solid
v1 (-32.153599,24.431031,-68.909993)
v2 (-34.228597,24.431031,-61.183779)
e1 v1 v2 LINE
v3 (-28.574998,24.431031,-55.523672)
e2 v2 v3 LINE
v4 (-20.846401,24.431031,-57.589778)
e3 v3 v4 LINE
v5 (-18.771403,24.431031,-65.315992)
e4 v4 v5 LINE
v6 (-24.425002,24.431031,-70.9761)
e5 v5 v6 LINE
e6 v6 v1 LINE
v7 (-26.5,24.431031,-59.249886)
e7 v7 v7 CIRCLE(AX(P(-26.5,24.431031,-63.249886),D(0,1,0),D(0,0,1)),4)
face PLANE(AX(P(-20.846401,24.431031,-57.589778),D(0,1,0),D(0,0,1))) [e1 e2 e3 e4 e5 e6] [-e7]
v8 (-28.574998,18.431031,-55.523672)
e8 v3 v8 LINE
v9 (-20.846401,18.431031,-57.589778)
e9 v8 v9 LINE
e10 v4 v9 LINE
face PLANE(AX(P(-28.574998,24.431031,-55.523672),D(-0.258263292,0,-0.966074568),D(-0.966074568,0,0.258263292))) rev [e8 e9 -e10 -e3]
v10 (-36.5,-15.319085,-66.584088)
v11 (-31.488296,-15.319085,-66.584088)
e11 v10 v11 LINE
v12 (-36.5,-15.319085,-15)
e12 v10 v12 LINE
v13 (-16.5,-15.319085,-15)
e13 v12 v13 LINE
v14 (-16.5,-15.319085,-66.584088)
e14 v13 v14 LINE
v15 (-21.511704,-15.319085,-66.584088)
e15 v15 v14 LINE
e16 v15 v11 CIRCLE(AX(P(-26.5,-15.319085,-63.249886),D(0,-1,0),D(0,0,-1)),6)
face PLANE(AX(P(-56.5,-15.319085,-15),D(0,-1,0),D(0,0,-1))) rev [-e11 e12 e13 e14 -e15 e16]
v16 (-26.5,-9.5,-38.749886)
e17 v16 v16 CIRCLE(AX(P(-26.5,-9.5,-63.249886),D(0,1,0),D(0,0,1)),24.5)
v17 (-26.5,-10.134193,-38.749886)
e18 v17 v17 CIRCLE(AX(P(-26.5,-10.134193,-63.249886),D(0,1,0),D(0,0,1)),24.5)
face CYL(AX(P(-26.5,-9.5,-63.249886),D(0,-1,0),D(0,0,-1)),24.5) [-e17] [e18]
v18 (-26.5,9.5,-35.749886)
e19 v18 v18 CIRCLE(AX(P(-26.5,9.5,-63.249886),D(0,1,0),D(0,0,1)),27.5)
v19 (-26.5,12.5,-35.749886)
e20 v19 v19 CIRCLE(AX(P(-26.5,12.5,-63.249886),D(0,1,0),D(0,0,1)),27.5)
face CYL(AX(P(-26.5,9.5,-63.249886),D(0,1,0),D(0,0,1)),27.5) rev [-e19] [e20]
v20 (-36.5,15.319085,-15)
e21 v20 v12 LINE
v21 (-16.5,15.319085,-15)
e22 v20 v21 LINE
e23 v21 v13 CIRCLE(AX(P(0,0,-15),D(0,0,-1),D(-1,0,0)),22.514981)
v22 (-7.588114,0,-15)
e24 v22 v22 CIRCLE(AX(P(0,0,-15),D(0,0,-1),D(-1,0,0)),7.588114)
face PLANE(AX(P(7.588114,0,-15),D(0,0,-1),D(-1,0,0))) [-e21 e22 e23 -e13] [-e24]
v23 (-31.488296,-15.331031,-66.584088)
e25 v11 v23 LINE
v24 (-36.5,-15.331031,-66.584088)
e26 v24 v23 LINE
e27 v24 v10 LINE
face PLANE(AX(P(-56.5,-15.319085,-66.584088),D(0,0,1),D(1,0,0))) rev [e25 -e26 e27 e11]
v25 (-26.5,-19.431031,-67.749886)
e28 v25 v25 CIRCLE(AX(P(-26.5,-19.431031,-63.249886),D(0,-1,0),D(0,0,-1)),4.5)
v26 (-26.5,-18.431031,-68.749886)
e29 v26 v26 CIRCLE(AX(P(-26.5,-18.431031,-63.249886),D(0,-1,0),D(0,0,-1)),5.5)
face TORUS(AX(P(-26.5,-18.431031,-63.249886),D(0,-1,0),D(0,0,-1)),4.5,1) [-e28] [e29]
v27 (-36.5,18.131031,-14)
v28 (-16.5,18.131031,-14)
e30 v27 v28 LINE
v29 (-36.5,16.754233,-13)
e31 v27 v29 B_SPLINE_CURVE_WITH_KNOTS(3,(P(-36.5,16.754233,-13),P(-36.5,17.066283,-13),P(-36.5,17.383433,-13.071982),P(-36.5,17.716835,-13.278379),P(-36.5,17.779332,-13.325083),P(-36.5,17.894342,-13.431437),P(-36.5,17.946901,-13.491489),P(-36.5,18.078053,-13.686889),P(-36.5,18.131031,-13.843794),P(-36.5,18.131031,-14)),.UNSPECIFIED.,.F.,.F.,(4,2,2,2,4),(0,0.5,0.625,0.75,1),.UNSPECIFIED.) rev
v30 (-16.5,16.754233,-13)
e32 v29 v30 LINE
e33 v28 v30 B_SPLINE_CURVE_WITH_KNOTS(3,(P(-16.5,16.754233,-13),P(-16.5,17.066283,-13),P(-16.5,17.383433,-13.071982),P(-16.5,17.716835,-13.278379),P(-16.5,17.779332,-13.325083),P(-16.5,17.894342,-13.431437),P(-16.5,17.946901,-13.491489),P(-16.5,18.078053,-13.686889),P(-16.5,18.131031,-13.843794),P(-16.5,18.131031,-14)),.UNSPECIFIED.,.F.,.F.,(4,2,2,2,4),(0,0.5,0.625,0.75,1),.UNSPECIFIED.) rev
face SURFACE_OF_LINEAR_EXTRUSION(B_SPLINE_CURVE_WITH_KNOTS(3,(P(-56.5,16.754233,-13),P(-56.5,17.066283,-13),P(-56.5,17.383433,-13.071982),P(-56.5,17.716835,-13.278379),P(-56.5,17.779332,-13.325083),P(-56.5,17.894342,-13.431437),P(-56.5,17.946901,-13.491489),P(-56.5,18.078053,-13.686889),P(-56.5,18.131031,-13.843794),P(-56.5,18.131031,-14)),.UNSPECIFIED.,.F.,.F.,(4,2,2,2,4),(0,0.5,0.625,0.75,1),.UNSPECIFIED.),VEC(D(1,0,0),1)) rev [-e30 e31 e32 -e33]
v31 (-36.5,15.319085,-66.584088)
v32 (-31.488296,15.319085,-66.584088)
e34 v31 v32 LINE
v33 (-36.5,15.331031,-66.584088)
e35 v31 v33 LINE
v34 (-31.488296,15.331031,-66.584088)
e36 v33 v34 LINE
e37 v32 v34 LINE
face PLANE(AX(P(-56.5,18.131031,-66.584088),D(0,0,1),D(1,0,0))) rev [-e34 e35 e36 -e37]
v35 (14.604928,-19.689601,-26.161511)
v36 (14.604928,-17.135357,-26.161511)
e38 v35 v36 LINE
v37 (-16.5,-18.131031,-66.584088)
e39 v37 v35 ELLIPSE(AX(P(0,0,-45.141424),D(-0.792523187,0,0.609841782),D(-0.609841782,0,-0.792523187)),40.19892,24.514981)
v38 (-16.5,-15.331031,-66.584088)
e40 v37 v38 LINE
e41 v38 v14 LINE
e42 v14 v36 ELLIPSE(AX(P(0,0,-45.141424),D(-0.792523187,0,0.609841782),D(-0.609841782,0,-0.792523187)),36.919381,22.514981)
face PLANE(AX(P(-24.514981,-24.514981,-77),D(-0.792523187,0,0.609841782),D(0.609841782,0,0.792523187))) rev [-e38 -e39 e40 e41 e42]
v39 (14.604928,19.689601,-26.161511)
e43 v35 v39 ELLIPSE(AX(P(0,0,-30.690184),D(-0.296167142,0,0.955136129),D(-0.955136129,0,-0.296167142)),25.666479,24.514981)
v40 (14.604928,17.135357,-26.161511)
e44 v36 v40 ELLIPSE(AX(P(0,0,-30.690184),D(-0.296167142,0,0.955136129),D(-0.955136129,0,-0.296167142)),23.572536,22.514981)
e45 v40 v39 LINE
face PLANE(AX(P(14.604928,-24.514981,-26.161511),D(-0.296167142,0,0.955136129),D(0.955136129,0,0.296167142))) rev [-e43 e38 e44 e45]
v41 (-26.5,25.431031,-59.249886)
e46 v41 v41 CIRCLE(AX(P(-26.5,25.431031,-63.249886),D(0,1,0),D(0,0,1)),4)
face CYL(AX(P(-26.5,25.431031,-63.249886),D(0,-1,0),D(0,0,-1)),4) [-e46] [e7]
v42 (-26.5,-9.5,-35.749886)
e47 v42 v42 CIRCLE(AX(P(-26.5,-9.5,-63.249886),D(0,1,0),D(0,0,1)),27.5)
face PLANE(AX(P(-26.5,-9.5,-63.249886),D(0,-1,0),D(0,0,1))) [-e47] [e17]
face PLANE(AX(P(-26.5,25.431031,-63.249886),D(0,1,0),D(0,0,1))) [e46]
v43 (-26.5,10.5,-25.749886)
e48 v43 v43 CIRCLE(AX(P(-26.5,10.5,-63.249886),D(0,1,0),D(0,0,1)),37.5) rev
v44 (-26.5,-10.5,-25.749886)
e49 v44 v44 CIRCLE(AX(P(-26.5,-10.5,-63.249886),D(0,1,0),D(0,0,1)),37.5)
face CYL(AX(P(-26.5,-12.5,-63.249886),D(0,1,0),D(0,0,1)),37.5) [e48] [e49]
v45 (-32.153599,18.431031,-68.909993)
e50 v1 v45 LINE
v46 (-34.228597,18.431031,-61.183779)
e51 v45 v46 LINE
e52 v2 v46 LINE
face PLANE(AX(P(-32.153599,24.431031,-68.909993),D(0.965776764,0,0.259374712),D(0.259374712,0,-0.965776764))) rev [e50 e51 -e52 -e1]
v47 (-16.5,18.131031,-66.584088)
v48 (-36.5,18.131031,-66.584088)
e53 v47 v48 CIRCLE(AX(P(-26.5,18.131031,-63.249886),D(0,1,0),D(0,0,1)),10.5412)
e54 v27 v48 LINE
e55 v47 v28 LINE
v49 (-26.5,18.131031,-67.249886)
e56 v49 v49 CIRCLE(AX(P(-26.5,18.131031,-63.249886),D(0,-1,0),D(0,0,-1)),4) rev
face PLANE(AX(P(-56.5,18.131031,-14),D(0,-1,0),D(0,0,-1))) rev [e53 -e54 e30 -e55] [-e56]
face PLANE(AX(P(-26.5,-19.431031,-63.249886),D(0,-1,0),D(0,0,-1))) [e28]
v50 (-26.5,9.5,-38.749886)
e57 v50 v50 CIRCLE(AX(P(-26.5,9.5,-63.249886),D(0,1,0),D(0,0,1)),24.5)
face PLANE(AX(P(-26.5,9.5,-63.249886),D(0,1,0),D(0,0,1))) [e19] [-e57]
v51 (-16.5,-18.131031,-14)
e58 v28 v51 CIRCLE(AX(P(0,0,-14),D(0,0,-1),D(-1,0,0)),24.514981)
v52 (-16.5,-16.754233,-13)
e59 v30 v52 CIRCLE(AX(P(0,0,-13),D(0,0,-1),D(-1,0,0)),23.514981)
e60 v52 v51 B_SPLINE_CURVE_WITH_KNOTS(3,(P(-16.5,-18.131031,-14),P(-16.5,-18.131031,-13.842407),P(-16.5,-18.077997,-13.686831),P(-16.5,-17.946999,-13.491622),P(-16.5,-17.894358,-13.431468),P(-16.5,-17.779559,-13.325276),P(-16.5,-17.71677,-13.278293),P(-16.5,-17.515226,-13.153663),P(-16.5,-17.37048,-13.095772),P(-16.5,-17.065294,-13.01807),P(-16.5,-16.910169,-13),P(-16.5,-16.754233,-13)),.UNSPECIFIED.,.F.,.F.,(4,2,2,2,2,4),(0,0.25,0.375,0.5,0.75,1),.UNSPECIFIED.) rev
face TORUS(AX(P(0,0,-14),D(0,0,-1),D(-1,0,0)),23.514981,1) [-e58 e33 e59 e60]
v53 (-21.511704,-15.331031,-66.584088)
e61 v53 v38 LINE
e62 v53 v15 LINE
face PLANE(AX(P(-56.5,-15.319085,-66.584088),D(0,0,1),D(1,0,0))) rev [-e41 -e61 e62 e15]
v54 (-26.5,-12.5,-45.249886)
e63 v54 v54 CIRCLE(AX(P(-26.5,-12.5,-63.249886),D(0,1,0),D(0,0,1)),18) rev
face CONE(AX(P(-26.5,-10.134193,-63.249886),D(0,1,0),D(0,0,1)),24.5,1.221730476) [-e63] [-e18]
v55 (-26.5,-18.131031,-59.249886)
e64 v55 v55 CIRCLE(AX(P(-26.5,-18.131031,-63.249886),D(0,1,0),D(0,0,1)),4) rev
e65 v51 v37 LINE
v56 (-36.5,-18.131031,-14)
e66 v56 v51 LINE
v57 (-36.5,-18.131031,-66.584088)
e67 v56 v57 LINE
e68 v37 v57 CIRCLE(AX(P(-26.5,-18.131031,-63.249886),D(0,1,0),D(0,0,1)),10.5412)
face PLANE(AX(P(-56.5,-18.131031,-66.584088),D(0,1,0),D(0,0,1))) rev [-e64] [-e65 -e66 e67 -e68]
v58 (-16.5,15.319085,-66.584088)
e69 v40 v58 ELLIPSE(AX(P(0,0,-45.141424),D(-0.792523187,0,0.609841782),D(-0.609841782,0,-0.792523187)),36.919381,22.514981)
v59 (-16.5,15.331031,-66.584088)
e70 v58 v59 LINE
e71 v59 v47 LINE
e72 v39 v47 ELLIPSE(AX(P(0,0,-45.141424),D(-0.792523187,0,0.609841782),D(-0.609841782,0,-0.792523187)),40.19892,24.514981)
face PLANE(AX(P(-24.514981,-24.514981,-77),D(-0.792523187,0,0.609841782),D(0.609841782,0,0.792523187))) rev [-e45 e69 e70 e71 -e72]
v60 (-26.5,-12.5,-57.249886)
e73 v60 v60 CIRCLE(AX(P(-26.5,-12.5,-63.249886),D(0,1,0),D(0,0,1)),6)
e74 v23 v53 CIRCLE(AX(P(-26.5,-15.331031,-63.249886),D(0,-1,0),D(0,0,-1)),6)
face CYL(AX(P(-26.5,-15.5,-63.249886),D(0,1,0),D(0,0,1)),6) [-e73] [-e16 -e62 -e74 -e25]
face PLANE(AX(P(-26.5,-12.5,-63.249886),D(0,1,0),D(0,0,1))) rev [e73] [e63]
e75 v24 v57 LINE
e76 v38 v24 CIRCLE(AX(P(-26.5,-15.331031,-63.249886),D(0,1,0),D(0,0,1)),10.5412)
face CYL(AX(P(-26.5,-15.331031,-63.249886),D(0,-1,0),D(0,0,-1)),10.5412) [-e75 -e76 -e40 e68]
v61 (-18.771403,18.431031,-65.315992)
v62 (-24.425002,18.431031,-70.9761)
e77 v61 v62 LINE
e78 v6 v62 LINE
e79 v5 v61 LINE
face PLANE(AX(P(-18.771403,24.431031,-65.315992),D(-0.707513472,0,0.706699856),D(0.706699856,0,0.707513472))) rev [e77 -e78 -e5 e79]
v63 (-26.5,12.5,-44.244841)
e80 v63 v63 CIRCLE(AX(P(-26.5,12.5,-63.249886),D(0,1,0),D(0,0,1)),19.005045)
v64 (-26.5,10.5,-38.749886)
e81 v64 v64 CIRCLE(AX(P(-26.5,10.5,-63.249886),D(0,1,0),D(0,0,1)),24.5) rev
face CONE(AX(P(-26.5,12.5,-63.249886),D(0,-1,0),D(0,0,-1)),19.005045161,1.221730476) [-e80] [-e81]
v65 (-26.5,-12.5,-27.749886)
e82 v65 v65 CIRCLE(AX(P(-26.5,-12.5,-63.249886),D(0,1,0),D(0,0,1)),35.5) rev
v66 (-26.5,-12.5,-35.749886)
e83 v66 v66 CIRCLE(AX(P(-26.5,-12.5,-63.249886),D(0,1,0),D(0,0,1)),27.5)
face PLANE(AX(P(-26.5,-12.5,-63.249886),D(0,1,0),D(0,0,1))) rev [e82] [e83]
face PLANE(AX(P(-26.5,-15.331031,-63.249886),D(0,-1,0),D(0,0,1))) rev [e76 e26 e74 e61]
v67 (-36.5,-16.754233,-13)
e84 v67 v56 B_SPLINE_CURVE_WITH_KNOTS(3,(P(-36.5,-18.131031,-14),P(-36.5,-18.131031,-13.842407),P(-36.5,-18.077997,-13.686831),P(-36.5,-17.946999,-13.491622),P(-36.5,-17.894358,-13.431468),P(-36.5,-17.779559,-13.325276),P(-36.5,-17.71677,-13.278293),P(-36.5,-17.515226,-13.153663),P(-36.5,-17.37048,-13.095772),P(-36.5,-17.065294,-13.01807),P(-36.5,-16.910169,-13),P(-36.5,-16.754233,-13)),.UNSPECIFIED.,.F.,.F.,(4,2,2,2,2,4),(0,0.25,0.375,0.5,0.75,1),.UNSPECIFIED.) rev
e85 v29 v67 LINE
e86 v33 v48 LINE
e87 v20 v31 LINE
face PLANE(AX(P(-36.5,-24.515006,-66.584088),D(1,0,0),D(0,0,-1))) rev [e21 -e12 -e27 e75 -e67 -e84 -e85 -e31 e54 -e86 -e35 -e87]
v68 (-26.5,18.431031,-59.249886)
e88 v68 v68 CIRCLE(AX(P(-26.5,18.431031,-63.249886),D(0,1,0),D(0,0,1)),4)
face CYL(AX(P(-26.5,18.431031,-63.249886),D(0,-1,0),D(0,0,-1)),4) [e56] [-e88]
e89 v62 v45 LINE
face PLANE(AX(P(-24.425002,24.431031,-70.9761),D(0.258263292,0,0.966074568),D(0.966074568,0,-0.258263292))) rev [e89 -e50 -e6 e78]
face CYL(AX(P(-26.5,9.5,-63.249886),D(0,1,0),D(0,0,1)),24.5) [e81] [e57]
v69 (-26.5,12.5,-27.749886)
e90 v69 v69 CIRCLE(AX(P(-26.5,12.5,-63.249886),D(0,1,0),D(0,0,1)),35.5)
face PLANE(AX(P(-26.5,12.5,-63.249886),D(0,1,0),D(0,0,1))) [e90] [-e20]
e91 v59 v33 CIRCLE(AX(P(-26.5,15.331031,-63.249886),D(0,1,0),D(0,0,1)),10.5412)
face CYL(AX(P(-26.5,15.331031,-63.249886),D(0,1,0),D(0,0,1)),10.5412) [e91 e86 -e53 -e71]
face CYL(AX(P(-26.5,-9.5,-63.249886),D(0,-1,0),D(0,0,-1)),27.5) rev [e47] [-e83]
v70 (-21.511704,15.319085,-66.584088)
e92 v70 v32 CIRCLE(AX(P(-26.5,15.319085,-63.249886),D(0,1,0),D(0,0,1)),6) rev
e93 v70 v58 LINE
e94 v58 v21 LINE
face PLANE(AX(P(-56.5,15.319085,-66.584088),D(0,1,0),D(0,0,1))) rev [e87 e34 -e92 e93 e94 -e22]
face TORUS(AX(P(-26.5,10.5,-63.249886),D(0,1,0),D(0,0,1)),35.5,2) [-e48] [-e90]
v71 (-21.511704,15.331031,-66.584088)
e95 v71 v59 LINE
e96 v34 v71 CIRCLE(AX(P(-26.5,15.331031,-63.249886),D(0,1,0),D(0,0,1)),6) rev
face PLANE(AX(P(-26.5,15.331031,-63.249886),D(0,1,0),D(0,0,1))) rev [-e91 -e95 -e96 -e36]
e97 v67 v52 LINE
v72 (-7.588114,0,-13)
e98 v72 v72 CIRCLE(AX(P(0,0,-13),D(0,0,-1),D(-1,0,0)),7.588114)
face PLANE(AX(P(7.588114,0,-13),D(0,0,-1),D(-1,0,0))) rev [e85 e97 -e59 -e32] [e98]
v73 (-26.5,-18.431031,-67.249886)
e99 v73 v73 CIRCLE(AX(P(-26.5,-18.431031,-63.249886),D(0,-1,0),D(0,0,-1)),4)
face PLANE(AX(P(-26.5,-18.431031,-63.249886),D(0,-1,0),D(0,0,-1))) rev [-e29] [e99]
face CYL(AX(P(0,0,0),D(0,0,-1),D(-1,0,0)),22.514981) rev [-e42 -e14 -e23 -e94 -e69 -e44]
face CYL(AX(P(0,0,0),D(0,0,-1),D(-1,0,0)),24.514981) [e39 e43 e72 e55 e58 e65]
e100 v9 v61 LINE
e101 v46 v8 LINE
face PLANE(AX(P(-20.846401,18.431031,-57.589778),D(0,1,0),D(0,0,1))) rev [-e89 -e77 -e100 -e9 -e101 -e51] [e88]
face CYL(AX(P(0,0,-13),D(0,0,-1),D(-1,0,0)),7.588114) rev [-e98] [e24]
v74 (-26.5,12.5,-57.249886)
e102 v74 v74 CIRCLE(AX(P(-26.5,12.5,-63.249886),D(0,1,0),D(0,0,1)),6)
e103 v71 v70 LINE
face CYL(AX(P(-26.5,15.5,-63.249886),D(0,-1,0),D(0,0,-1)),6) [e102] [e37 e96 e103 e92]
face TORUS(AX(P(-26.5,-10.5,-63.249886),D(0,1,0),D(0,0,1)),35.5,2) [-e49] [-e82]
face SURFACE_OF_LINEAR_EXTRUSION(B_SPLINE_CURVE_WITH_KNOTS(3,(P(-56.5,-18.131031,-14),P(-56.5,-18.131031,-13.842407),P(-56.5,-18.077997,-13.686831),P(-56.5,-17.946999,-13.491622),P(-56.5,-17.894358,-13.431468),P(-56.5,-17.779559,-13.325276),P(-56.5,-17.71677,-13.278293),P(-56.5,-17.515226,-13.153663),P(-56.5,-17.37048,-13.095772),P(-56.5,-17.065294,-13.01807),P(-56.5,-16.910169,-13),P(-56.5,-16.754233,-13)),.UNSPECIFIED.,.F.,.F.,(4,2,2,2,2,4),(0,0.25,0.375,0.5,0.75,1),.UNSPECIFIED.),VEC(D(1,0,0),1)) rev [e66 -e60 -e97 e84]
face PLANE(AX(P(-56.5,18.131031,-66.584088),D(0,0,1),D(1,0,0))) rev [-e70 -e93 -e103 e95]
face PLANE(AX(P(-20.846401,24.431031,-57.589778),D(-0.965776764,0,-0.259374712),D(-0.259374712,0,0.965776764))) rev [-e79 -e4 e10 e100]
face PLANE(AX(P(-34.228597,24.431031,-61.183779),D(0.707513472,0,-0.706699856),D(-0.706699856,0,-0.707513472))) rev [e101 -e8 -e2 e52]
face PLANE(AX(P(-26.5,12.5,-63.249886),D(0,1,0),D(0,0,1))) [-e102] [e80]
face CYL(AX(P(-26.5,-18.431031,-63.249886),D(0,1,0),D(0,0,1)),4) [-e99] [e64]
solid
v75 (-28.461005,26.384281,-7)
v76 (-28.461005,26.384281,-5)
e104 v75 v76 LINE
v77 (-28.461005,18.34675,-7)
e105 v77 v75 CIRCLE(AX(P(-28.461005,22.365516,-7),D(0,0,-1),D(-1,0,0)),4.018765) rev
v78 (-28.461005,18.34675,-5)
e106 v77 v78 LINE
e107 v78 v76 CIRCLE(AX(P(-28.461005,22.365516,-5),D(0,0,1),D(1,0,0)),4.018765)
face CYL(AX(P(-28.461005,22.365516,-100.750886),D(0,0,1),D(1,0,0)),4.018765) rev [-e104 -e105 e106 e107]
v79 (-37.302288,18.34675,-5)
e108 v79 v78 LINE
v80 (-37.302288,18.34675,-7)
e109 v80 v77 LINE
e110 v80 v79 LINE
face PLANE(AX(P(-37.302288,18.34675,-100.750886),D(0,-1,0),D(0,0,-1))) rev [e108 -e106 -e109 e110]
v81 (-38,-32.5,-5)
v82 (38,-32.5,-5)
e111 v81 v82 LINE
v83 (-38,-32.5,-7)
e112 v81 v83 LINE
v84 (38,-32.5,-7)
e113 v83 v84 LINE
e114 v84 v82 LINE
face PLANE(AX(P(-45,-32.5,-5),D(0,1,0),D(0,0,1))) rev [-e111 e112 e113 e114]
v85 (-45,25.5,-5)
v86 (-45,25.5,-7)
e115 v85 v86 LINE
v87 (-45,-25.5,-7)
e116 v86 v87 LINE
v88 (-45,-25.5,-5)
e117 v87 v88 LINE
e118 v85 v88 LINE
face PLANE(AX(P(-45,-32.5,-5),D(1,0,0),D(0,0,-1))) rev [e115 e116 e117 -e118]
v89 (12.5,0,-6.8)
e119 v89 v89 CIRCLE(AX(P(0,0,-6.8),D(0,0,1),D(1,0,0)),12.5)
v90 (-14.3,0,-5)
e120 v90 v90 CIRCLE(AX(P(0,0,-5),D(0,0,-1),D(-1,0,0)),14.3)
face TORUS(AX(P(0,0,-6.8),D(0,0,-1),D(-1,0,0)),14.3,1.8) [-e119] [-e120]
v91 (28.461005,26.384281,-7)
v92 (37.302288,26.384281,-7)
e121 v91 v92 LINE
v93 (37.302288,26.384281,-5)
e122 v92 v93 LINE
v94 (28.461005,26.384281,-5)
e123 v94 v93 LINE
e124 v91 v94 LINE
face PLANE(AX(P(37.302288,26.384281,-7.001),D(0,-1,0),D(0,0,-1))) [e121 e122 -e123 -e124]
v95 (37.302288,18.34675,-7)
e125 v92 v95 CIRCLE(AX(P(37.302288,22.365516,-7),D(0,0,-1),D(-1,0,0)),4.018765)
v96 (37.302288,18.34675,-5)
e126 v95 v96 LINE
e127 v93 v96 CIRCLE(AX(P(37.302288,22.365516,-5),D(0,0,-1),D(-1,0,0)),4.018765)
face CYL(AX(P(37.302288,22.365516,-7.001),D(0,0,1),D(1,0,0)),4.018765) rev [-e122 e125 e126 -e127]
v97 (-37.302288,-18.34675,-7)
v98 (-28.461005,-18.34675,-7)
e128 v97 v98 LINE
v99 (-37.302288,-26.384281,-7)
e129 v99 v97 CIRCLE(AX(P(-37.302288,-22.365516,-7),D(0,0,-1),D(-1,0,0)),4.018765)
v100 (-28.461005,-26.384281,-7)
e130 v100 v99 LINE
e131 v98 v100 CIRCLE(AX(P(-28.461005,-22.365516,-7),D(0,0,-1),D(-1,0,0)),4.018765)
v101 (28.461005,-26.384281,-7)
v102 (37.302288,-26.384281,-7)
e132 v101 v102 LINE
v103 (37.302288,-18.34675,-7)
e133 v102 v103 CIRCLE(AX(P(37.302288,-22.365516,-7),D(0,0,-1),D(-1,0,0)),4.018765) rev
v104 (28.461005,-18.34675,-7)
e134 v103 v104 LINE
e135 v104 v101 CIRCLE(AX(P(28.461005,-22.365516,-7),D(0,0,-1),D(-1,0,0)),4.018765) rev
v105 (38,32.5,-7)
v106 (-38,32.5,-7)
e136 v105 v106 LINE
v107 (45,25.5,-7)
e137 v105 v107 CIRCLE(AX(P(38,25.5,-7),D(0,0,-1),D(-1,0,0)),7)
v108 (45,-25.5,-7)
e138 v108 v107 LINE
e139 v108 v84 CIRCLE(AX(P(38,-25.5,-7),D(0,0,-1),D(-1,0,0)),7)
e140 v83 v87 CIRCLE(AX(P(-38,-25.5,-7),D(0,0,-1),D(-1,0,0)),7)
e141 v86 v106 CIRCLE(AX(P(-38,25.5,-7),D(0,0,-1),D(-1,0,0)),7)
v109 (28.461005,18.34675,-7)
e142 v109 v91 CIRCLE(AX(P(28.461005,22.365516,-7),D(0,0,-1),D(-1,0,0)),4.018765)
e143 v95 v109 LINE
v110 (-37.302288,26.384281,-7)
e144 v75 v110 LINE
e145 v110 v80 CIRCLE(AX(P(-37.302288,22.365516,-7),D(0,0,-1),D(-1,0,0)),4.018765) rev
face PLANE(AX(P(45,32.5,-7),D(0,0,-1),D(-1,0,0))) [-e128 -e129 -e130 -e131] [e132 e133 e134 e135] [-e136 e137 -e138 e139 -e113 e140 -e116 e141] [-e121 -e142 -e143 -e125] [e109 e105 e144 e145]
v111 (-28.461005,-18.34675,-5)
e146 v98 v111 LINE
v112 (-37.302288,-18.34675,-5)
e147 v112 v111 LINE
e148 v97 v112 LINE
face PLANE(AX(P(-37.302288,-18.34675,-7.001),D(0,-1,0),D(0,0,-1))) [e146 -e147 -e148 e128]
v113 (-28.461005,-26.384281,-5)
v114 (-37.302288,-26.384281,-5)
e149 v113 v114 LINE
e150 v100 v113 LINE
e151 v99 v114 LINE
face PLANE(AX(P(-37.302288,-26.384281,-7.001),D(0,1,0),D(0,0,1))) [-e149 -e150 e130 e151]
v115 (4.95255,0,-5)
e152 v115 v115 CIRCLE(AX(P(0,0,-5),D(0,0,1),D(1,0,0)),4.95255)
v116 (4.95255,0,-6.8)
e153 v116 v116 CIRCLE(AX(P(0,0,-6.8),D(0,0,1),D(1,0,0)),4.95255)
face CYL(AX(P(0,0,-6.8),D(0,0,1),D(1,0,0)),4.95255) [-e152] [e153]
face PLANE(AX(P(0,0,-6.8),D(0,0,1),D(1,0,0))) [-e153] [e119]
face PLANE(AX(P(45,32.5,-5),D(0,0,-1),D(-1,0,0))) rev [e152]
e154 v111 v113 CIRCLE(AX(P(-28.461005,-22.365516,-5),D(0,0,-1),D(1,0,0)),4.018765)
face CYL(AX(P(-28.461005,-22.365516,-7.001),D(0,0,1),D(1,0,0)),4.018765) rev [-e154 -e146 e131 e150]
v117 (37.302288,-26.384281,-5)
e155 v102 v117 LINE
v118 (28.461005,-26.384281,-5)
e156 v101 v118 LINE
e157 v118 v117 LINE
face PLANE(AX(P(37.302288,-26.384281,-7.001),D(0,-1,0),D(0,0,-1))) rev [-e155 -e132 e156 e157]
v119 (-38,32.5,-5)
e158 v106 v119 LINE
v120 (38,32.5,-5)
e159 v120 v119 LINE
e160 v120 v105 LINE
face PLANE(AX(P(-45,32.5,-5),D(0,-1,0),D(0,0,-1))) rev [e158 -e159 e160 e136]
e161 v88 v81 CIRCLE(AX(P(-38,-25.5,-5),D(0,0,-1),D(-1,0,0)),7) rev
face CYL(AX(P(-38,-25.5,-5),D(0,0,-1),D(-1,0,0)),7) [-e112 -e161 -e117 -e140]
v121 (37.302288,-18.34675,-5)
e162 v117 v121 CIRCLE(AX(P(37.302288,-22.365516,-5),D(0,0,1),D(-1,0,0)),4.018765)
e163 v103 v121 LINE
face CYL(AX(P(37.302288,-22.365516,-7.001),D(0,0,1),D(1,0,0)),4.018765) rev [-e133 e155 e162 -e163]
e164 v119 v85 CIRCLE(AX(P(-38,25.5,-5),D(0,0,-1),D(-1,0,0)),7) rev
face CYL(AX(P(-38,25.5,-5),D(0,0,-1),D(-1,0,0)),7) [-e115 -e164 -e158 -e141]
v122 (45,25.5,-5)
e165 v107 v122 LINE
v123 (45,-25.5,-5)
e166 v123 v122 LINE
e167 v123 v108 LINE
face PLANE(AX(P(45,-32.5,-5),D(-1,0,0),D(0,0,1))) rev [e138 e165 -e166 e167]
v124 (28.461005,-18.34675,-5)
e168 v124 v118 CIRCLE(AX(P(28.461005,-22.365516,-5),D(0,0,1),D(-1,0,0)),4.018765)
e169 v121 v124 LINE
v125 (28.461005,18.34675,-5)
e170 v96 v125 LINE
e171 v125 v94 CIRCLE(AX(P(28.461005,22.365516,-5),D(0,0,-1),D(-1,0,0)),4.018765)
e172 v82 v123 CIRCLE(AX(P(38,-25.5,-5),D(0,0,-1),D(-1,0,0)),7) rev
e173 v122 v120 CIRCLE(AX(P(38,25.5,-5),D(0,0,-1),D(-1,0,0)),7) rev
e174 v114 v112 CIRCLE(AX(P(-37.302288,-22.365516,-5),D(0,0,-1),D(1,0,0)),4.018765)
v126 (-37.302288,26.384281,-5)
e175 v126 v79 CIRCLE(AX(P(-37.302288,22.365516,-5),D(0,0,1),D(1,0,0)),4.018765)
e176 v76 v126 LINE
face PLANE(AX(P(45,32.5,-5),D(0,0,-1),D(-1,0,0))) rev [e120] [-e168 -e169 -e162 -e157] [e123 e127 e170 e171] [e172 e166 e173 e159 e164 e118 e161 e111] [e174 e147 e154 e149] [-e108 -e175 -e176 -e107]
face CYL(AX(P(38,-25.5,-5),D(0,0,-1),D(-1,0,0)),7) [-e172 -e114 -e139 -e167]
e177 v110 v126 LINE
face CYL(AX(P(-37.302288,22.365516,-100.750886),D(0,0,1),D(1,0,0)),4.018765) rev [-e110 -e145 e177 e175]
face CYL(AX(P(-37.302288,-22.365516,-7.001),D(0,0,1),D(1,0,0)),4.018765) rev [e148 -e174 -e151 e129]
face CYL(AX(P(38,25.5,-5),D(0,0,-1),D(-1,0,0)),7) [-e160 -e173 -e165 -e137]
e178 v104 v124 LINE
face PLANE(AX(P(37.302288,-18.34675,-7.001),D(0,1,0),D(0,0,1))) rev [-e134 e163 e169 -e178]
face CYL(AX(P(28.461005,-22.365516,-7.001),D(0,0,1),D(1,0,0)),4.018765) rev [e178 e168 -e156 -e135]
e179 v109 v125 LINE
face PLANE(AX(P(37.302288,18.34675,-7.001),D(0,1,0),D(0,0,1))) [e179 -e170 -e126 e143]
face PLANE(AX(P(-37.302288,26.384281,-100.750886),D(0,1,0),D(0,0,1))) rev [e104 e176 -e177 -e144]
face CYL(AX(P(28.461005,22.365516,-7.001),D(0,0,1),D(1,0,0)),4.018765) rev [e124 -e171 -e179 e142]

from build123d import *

# Parameters (mm, degrees)
CUT_EXTRUDE_2_DEPTH      = 85.445062578
CUT_EXTRUDE_2_DEPTH_BACK = 85.445062578
CUT_EXTRUDE_3_DEPTH      = 85.445062578
CUT_EXTRUDE_3_DEPTH_BACK = 85.445062578
EXTRUDE_6_DEPTH          = 40
EXTRUDE_7_DEPTH          = 2.8
CUT_EXTRUDE_4_DEPTH      = 103.254861861
SKETCH_18_R              = 4
EXTRUDE_8_DEPTH          = 0.3
EXTRUDE_9_DEPTH          = 6
SKETCH_20_R              = 4
EXTRUDE_10_DEPTH         = 1
EXTRUDE_START            = 0.3
SKETCH_21_R              = 4
EXTRUDE_11_DEPTH         = 0.3
SKETCH_22_R              = 5.5
EXTRUDE_12_DEPTH         = 1
FILLET_1_R               = 1
EXTRUDE_13_DEPTH         = 12.5
EXTRUDE_13_DEPTH_BACK    = 12.5
SKETCH_23_R              = 37.5
FILLET_2_R               = 2
SKETCH_24_R              = 27.5
SKETCH_24_R_2            = 24.5
CUT_EXTRUDE_5_DEPTH      = 3
CHAMFER_1_SIZE           = 2
CHAMFER_1_SIZE2          = 5.494954839
CHAMFER_2_SIZE           = 6.5
CHAMFER_2_SIZE2          = 2.365806523
SKETCH_25_R              = 6
EXTRUDE_14_DEPTH         = 3
SKETCH_33_W              = 90
SKETCH_33_H              = 65
EXTRUDE_22_DEPTH         = 2
FILLET_5_R               = 7
CUT_EXTRUDE_6_DEPTH      = 2
MIRROR_9_COPY_1_DEPTH    = 2
SKETCH_35_R              = 12.5
SKETCH_35_R_2            = 4.952549827
CUT_EXTRUDE_8_DEPTH      = 1.8
FILLET_6_R               = 1.8
CUT_EXTRUDE_9_DEPTH      = 20


# Read off the part's stored shape, not the designer's step: 加厚3
with BuildPart() as part:
    # 加厚3 outline → 加厚3 (revolve)
    with BuildSketch(Plane.XZ):
        with BuildLine():
            Line((22.51498107, -15), (22.51498107, -77))
            Line((22.51498107, -77), (24.51498107, -77))
            Line((24.51498107, -77), (24.51498107, -14))
            ThreePointArc((24.51498107, -14), (24.222087851, -13.292893219), (23.51498107, -13))
            Line((23.51498107, -13), (7.588114325, -13))
            Line((7.588114325, -13), (7.588114325, -15))
            Line((7.588114325, -15), (22.51498107, -15))
        make_face()
    revolve(axis=Axis((0, 0, 0), (0, 0, 1)))

    # 草图13 → 切除-拉伸2 (cut, two sides: drawn at the far end of the back side and taken through both)
    with BuildSketch(Plane(origin=(0, 0, 0), x_dir=(1, 0, 0), z_dir=(0, 1, 0)).offset(-CUT_EXTRUDE_2_DEPTH_BACK)):
        Polygon((-24.51498107, 77), (14.604928022, 26.16151052), (24.51498107, 23.088616514), (24.51498107, 77), align=None)
    extrude(amount=CUT_EXTRUDE_2_DEPTH + CUT_EXTRUDE_2_DEPTH_BACK, mode=Mode.SUBTRACT)

    # 草图14 → 切除-拉伸3 (cut, two sides: drawn at the far end of the back side and taken through both)
    with BuildSketch(Plane(origin=(0, 0, 0), x_dir=(1, 0, 0), z_dir=(0, 1, 0)).offset(-CUT_EXTRUDE_3_DEPTH_BACK)):
        Polygon((-16.5, 70.472511213), (-16.5, 12.57524565), (-25.363625659, 12.57524565), (-25.363625659, 79.702348144), align=None)
    extrude(amount=CUT_EXTRUDE_3_DEPTH + CUT_EXTRUDE_3_DEPTH_BACK, mode=Mode.SUBTRACT)

    # 草图15 → 凸台-拉伸6 (add)
    with BuildSketch(Plane.ZY.offset(16.5)):
        with BuildLine():
            Line((-13, -16.754233337), (-13, 16.754233337))
            add(Edge.make_bspline(
                [(-13, 16.754233337), (-13, 17.066282989), (-13.071981627, 17.383432621), (-13.278379206, 17.716834739), (-13.32508278, 17.779332115), (-13.431437184, 17.894341909), (-13.491489359, 17.946901419), (-13.686888914, 18.078052515), (-13.843794025, 18.131031324), (-14, 18.131031324)],
                knots=[0, 0, 0, 0, 0.5, 0.5, 0.625, 0.625, 0.75, 0.75, 1, 1, 1, 1], degree=3))
            Line((-14, 18.131031324), (-66.584087994, 18.131031324))
            Line((-66.584087994, 18.131031324), (-66.584087994, 15.31908524))
            Line((-66.584087994, 15.31908524), (-15, 15.31908524))
            Line((-15, 15.31908524), (-15, -15.31908524))
            Line((-15, -15.31908524), (-66.584087994, -15.31908524))
            Line((-66.584087994, -15.31908524), (-66.584087994, -18.131031324))
            Line((-66.584087994, -18.131031324), (-14, -18.131031324))
            add(Edge.make_bspline(
                [(-14, -18.131031324), (-13.842407053, -18.131031324), (-13.686831177, -18.07799673), (-13.491621762, -17.946998796), (-13.431468043, -17.894358188), (-13.325276406, -17.779558555), (-13.278292746, -17.716769524), (-13.153663134, -17.515226129), (-13.095772202, -17.370480096), (-13.018069892, -17.065294363), (-13, -16.910169012), (-13, -16.754233337)],
                knots=[0, 0, 0, 0, 0.25, 0.25, 0.375, 0.375, 0.5, 0.5, 0.75, 0.75, 1, 1, 1, 1], degree=3))
        make_face()
    extrude(amount=EXTRUDE_6_DEPTH)

    # 草图16 → 凸台-拉伸7 (add)
    with BuildSketch(Plane(origin=(0, 18.131031324, 0), x_dir=(1, 0, 0), z_dir=(0, 1, 0))):
        with BuildLine():
            Line((-16.5, 66.584087994), (-36.5, 66.584087994))
            ThreePointArc((-36.5, 66.584087994), (-26.5, 73.791086056), (-16.5, 66.584087994))
        make_face()
    extrude_7 = extrude(amount=-EXTRUDE_7_DEPTH)

    # 镜向1: 凸台-拉伸7 across plane
    add(extrude_7.mirror(Plane.ZX))

    # 草图17 → 切除-拉伸4 (cut, through all)
    with BuildSketch(Plane(origin=(0, 18.131031324, 0), x_dir=(1, 0, 0), z_dir=(0, 1, 0))):
        with BuildLine():
            Line((-36.5, 66.584087994), (-36.5, 34.244911042))
            ThreePointArc((-36.5, 34.244911042), (-41.122054778, 23.08628371), (-52.28068211, 18.464228931))
            Line((-52.28068211, 18.464228931), (-56.5, 18.464228931))
            Line((-56.5, 18.464228931), (-56.5, 66.584087994))
            Line((-56.5, 66.584087994), (-36.5, 66.584087994))
        make_face()
    extrude(amount=-CUT_EXTRUDE_4_DEPTH, mode=Mode.SUBTRACT)

    # 草图18 → 凸台-拉伸8 (add)
    with BuildSketch(Plane(origin=(0, 18.131031324, 0), x_dir=(1, 0, 0), z_dir=(0, 1, 0))):
        with Locations(Location((-26.5, 63.249885701, 0), (0, 0, 90))):
            Circle(SKETCH_18_R)
    extrude(amount=EXTRUDE_8_DEPTH)

    # 草图19 → 凸台-拉伸9 (add)
    with BuildSketch(Plane(origin=(0, 18.431031324, 0), x_dir=(1, 0, 0), z_dir=(0, 1, 0))):
        Polygon((-20.84640115, 57.589777924), (-18.771403452, 65.31599204), (-24.425002303, 70.976099816), (-32.15359885, 68.909993477), (-34.228596548, 61.183779361), (-28.574997697, 55.523671585), align=None)
    extrude(amount=EXTRUDE_9_DEPTH)

    # 草图20 → 凸台-拉伸10 (add)
    with BuildSketch(Plane(origin=(0, 24.431031324, 0), x_dir=(1, 0, 0), z_dir=(0, 1, 0))):
        with Locations(Location((-26.5, 63.249885701, 0), (0, 0, 90))):
            Circle(SKETCH_20_R)
    extrude(amount=EXTRUDE_10_DEPTH)

    # 草图21 → 凸台-拉伸11 (add)
    with BuildSketch(Plane.XZ.offset(18.131031324).offset(EXTRUDE_START)):
        with Locations(Location((-26.5, -63.249885701, 0), (0, 0, 270))):
            Circle(SKETCH_21_R)
    extrude(amount=-EXTRUDE_11_DEPTH)

    # 草图22 → 凸台-拉伸12 (add)
    with BuildSketch(Plane.XZ.offset(18.431031324)):
        with Locations(Location((-26.5, -63.249885701, 0), (0, 0, 270))):
            Circle(SKETCH_22_R)
    extrude(amount=EXTRUDE_12_DEPTH)

    # 圆角1
    fillet_1_edges = [part.edges().sort_by_distance(p)[0] for p in [
        (-26.5, -19.431031324, -57.749885701),
    ]]
    fillet(fillet_1_edges, radius=FILLET_1_R - 0.0001)  # a hair under: the kernel refuses the full size



with BuildPart() as body_2:
    # 草图23 → 凸台-拉伸13 (new, two sides: drawn at the far end of the back side and taken through both)
    with BuildSketch(Plane(origin=(0, 0, 0), x_dir=(1, 0, 0), z_dir=(0, 1, 0)).offset(-EXTRUDE_13_DEPTH_BACK)):
        with Locations(Location((-26.5, 63.249885701, 0), (0, 0, 270))):
            Circle(SKETCH_23_R)
    extrude(amount=EXTRUDE_13_DEPTH + EXTRUDE_13_DEPTH_BACK)

    # 圆角2
    fillet_2_edges = [body_2.edges().sort_by_distance(p)[0] for p in [
        (-26.5, -12.5, -100.749885701),
        (-26.5, 12.5, -100.749885701),
    ]]
    fillet(fillet_2_edges, radius=FILLET_2_R)

    # 草图24 → 切除-拉伸5 (cut)
    with BuildSketch(Plane(origin=(0, 12.5, 0), x_dir=(1, 0, 0), z_dir=(0, 1, 0))):
        with Locations(Location((-26.5, 63.249885701, 0), (0, 0, 270))):
            Circle(SKETCH_24_R)
        with Locations(Location((-26.5, 63.249885701, 0), (0, 0, 270))):
            Circle(SKETCH_24_R_2, mode=Mode.SUBTRACT)
    cut_extrude_5 = extrude(amount=-CUT_EXTRUDE_5_DEPTH, mode=Mode.SUBTRACT)

    # 镜向2: 切除-拉伸5 across plane
    add(cut_extrude_5.mirror(Plane.ZX), mode=Mode.SUBTRACT)

    # 倒角1
    chamfer_1_edges = [body_2.edges().sort_by_distance(p)[0] for p in [
        (-26.5, 12.5, -87.749885701),
    ]]
    chamfer_1_side = [body_2.faces().sort_by_distance(p)[0] for p in [
        (-26.5, 11, -87.749885701),
    ]]
    chamfer(chamfer_1_edges, length=CHAMFER_1_SIZE, length2=CHAMFER_1_SIZE2, reference=chamfer_1_side[0])

    # 倒角2
    chamfer_2_edges = [body_2.edges().sort_by_distance(p)[0] for p in [
        (-26.5, -12.5, -87.749885701),
    ]]
    chamfer_2_side = [body_2.faces().sort_by_distance(p)[0] for p in [
        (-26.5, -12.5, -63.249885701),
    ]]
    chamfer(chamfer_2_edges, length=CHAMFER_2_SIZE, length2=CHAMFER_2_SIZE2, reference=chamfer_2_side[0])


with BuildPart() as part_1:
    add(part.part)

    add(body_2.part)  # 凸台-拉伸14 merges body 2
    # 草图25 → 凸台-拉伸14 (add)
    with BuildSketch(Plane(origin=(0, 12.5, 0), x_dir=(1, 0, 0), z_dir=(0, 1, 0))):
        with Locations(Location((-26.5, 63.249885701, 0), (0, 0, 33.758968922))):
            Circle(SKETCH_25_R)
    extrude_14 = extrude(amount=EXTRUDE_14_DEPTH)

    # 镜向5: 凸台-拉伸14 across plane
    add(extrude_14.mirror(Plane.ZX))

    # 草图36 → 切除-拉伸9 (cut)
    with BuildSketch(Plane.ZY.offset(56.5)):
        Polygon((-69.119671406, -14.511109391), (-69.119671406, -27.940534837), (-12.081507286, -27.940534837), (-12.081507286, 31.901575255), (-69.119671406, 31.901575255), (-69.119671406, 14.487595006), (-19.386524424, 14.487595006), (-19.386524424, -14.511109391), align=None)
    extrude(amount=-CUT_EXTRUDE_9_DEPTH, mode=Mode.SUBTRACT)


with BuildPart() as body_2_2:
    # 草图33 → 凸台-拉伸22 (new body)
    with BuildSketch(Plane.XY.offset(-7)):
        Rectangle(SKETCH_33_W, SKETCH_33_H)
    extrude(amount=EXTRUDE_22_DEPTH)

    # 圆角5
    fillet_5_edges = [body_2_2.edges().sort_by_distance(p)[0] for p in [
        (45, -32.5, -6),
        (-45, -32.5, -6),
        (-45, 32.5, -6),
        (45, 32.5, -6),
    ]]
    fillet(fillet_5_edges, radius=FILLET_5_R)

    # 草图34 → 切除-拉伸6 (cut)
    with BuildSketch(Plane.XY.offset(-5)):
        with BuildLine():
            Line((-37.302288021, 26.384280733), (-28.461004649, 26.384280733))
            ThreePointArc((-28.461004649, 26.384280733), (-24.44223948, 22.365515564), (-28.461004649, 18.346750395))
            Line((-28.461004649, 18.346750395), (-37.302288021, 18.346750395))
            ThreePointArc((-37.302288021, 18.346750395), (-41.32105319, 22.365515564), (-37.302288021, 26.384280733))
        make_face()
    cut_extrude_6 = extrude(amount=-CUT_EXTRUDE_6_DEPTH, mode=Mode.SUBTRACT)

    # 镜向8: 切除-拉伸6 across plane
    add(cut_extrude_6.mirror(Plane.ZX), mode=Mode.SUBTRACT)

    # 镜向9: 切除-拉伸6 across plane
    add(cut_extrude_6.mirror(Plane(origin=(0, 0, 0), x_dir=(0, 0, 1), z_dir=(1, 0, 0))), mode=Mode.SUBTRACT)

    # 镜向9 copy 1 sketch → 镜向9 copy 1 (cut)
    with BuildSketch(Plane(origin=(0, 0, -5), x_dir=(-1, 0, 0), z_dir=(0, 0, 1))):
        with BuildLine():
            Line((-37.302288021, 26.384280733), (-28.461004649, 26.384280733))
            ThreePointArc((-28.461004649, 26.384280733), (-24.44223948, 22.365515564), (-28.461004649, 18.346750395))
            Line((-28.461004649, 18.346750395), (-37.302288021, 18.346750395))
            ThreePointArc((-37.302288021, 18.346750395), (-41.32105319, 22.365515564), (-37.302288021, 26.384280733))
        make_face()
    extrude(amount=-MIRROR_9_COPY_1_DEPTH, mode=Mode.SUBTRACT)

    # 草图35 → 切除-拉伸8 (cut)
    with BuildSketch(Plane.XY.offset(-5)):
        Circle(SKETCH_35_R)
        Circle(SKETCH_35_R_2, mode=Mode.SUBTRACT)
    extrude(amount=-CUT_EXTRUDE_8_DEPTH, mode=Mode.SUBTRACT)

    # 圆角6
    fillet_6_edges = [body_2_2.edges().sort_by_distance(p)[0] for p in [
        (-12.5, 0, -5),
    ]]
    fillet(fillet_6_edges, radius=FILLET_6_R - 0.0001)  # a hair under: the kernel refuses the full size


solid = Compound([part_1.part, body_2_2.part])
